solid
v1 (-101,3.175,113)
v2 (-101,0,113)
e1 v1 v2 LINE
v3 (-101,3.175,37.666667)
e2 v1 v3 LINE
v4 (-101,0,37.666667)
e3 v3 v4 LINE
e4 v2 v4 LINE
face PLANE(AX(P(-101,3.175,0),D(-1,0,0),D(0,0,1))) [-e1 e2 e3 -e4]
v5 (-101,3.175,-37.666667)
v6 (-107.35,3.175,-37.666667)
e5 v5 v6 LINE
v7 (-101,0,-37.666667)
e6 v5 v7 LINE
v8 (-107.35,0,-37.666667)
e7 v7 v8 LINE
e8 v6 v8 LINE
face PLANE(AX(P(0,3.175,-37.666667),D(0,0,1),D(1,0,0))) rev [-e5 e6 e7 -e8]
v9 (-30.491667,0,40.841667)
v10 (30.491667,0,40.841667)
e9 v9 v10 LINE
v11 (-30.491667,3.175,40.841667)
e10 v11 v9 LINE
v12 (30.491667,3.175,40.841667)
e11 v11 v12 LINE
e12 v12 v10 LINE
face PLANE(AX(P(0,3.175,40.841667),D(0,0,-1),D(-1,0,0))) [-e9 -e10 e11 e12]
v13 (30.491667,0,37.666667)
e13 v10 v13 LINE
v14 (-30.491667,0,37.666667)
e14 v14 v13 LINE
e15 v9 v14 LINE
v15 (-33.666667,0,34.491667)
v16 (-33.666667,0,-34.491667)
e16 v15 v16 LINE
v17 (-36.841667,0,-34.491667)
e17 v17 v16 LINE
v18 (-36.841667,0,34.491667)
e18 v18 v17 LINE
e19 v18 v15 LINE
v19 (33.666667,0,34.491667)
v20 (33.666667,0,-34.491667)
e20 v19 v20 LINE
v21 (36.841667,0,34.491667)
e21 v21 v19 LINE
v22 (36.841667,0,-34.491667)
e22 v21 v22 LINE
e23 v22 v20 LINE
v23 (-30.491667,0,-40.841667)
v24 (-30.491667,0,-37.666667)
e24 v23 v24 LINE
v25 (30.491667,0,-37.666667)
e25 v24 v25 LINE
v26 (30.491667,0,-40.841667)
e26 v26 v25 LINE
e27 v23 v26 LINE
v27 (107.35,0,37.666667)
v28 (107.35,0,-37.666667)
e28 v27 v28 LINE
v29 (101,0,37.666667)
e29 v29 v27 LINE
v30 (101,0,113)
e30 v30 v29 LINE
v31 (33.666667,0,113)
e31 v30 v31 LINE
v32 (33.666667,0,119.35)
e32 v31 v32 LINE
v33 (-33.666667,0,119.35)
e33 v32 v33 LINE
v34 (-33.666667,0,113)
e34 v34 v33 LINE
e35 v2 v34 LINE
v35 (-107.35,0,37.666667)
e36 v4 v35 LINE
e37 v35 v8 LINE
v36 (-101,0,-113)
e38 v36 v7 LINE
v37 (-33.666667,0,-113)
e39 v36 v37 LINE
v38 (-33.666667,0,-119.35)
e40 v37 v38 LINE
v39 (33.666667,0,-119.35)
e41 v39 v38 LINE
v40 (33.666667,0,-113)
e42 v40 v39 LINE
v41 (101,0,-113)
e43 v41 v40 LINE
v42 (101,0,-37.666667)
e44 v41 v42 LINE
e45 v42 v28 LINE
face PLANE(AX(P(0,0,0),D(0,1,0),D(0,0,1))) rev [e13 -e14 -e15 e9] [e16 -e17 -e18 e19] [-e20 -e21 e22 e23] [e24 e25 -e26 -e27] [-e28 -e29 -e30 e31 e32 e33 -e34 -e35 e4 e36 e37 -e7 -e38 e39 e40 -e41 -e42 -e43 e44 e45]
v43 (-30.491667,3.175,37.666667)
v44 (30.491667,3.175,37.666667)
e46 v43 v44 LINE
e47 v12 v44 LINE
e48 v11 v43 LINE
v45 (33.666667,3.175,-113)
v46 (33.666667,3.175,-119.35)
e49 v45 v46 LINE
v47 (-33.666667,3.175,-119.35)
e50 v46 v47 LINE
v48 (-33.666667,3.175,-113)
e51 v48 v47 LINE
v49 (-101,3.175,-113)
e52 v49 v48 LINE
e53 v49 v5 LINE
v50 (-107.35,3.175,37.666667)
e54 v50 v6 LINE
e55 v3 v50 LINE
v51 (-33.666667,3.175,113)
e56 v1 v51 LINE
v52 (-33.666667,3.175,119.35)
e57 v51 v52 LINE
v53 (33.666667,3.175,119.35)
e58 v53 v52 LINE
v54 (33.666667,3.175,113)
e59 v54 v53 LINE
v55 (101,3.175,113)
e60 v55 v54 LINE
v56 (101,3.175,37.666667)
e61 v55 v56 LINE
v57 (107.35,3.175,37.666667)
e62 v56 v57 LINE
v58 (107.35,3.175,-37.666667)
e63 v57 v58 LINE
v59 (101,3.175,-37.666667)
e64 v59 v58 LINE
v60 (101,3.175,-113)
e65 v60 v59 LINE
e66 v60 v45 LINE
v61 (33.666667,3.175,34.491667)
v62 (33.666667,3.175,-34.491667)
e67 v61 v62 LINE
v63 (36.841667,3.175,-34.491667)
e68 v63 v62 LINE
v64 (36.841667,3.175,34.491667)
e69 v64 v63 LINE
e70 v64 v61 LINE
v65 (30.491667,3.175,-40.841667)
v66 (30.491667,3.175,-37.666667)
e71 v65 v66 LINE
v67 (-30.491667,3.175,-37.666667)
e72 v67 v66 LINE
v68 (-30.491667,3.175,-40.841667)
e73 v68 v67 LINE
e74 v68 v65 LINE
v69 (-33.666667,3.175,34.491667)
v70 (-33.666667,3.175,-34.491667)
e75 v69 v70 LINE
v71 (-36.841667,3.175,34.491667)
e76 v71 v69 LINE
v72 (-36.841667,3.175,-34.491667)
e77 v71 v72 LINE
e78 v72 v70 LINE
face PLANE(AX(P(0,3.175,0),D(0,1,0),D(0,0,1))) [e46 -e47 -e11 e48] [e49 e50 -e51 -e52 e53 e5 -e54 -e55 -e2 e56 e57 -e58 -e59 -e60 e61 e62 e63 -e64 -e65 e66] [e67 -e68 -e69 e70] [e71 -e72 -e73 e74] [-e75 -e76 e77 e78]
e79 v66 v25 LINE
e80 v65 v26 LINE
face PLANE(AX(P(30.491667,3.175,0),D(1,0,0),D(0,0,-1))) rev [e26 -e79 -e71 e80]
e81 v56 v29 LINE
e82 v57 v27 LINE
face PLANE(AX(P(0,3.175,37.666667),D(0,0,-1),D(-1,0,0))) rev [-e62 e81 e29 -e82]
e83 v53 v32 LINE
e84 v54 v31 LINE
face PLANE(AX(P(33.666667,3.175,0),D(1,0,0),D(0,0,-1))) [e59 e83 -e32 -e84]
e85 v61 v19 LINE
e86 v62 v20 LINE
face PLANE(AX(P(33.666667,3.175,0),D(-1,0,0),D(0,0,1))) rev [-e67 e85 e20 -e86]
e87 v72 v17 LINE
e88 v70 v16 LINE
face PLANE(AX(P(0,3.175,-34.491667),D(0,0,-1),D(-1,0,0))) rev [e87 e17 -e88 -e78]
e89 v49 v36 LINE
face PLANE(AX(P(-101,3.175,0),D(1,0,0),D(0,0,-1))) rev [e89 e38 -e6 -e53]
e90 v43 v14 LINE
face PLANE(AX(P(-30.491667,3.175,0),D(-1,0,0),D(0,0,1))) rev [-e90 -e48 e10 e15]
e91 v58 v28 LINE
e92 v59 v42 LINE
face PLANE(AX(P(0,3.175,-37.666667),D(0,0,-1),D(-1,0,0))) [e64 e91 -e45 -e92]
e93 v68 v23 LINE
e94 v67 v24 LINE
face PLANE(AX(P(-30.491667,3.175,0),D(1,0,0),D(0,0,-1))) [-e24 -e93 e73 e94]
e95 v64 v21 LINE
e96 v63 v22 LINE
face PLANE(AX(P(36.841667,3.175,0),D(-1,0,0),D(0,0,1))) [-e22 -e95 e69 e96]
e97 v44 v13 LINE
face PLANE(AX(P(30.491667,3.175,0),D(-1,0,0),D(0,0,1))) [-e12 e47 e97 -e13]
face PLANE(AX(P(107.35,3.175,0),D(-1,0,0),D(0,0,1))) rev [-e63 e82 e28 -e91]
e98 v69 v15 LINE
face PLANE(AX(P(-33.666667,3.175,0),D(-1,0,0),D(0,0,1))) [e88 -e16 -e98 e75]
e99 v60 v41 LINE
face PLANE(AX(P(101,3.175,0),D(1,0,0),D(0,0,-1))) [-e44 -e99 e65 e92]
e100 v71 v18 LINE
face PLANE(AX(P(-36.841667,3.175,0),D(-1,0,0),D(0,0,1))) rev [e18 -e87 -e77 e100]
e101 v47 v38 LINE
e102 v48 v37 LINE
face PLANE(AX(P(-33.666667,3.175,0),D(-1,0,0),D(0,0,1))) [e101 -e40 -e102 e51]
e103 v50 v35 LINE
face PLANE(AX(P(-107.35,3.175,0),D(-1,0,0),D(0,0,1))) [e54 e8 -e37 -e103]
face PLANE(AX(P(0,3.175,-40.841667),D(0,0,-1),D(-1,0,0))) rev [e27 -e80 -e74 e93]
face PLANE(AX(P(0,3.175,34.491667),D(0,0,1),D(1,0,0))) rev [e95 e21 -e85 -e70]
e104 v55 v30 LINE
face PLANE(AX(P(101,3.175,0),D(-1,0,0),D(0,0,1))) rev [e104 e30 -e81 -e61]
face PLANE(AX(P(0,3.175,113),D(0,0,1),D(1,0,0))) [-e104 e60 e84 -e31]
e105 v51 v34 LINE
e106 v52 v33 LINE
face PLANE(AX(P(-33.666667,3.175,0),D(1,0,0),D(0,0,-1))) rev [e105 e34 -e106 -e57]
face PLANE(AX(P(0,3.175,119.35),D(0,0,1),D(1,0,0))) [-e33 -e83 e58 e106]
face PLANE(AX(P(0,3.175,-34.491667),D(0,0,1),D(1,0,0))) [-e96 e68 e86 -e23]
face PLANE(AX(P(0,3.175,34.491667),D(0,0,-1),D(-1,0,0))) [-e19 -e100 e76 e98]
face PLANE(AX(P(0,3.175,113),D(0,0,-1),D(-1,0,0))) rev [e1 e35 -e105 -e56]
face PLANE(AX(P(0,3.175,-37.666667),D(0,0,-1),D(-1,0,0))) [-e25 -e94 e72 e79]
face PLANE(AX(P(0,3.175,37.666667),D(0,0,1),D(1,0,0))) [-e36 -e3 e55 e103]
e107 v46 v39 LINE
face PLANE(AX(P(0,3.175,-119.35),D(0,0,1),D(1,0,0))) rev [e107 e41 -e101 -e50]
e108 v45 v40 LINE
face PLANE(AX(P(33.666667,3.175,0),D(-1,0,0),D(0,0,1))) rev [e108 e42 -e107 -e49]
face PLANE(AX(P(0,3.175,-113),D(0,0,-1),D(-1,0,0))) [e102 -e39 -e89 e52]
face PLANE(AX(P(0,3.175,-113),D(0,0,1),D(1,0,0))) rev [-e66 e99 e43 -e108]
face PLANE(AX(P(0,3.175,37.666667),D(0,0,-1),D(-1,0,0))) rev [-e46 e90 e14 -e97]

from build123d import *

# Parameters (mm, degrees)
SKETCH1_W                 = 6.35
SKETCH1_H                 = 37.666666667
SKETCH1_W_2               = 33.666666667
SKETCH1_H_2               = 6.35
BOSS_EXTRUDE1_DEPTH       = 3.175
MIRROR1_START             = -101
MIRROR1_OUTLINE_W         = 3.175
MIRROR1_OUTLINE_H         = 3.175
MIRROR1_OUTLINE_H_2       = 72.158333333
MIRROR1_DEPTH             = 101
MIRROR1_START_2           = -107.35
MIRROR1_2_OUTLINE_W       = 3.175
MIRROR1_2_OUTLINE_H       = 37.666666667
MIRROR1_2_DEPTH           = 70.508333333
MIRROR1_START_3           = -33.666666667
MIRROR1_3_OUTLINE_W       = 3.175
MIRROR1_3_OUTLINE_H       = 34.491666667
MIRROR1_3_OUTLINE_H_2     = 6.35
MIRROR1_3_DEPTH           = 33.666666667
MIRROR1_4_OUTLINE_W       = 3.175
MIRROR1_4_OUTLINE_H       = 3.175
MIRROR1_4_DEPTH           = 70.508333333
MIRROR4_COPY_1_SKETCH_W   = 6.35
MIRROR4_COPY_1_SKETCH_H   = 37.666666667
MIRROR4_COPY_1_SKETCH_W_2 = 33.666666667
MIRROR4_COPY_1_SKETCH_H_2 = 6.35
MIRROR4_COPY_1_DEPTH      = 3.175
MIRROR4_COPY_2_SKETCH_W   = 6.35
MIRROR4_COPY_2_SKETCH_H   = 37.666666667
MIRROR4_COPY_2_SKETCH_W_2 = 33.666666667
MIRROR4_COPY_2_SKETCH_H_2 = 6.35
MIRROR4_COPY_2_DEPTH      = 3.175


# Read off the part's stored shape, not the designer's step: Mirror1
with BuildPart() as part:
    # Sketch1 → Boss-Extrude1 (new body)
    with BuildSketch(Plane(origin=(0, 0, 0), x_dir=(1, 0, 0), z_dir=(0, 1, 0))):
        Polygon((-33.666666667, 113), (-101, 113), (-101, 37.666666667), (-101, 0), (-36.841666667, 0), (-36.841666667, 34.491666667), (-33.666666667, 34.491666667), (-33.666666667, 0), (0, 0), (0, 37.666666667), (-30.491666667, 37.666666667), (-30.491666667, 40.841666667), (0, 40.841666667), (0, 113), align=None)
        with Locations((-104.175, 18.833333334)):
            Rectangle(SKETCH1_W, SKETCH1_H)
        with Locations((-16.833333334, 116.175)):
            Rectangle(SKETCH1_W_2, SKETCH1_H_2)
    boss_extrude1 = extrude(amount=BOSS_EXTRUDE1_DEPTH)



with BuildPart() as body_2:
    # Mirror1 outline → Mirror1 (new body)
    with BuildSketch(Plane.YZ.offset(MIRROR1_START)):
        with Locations((1.5875, 36.079166667)):
            Rectangle(MIRROR1_OUTLINE_W, MIRROR1_OUTLINE_H)
        with Locations((1.5875, 76.920833333)):
            Rectangle(MIRROR1_OUTLINE_W, MIRROR1_OUTLINE_H_2)
    extrude(amount=MIRROR1_DEPTH)


with BuildPart() as part_1:
    add(part.part)

    add(body_2.part)  # Mirror1 2 merges body 2
    # Mirror1 2 outline → Mirror1 2 (add)
    with BuildSketch(Plane.YZ.offset(MIRROR1_START_2)):
        with Locations((1.5875, 18.833333334)):
            Rectangle(MIRROR1_2_OUTLINE_W, MIRROR1_2_OUTLINE_H)
    extrude(amount=MIRROR1_2_DEPTH)

    # Mirror1 3 outline → Mirror1 3 (add)
    with BuildSketch(Plane.YZ.offset(MIRROR1_START_3)):
        with Locations((1.5875, 17.245833334)):
            Rectangle(MIRROR1_3_OUTLINE_W, MIRROR1_3_OUTLINE_H)
        with Locations((1.5875, 116.175)):
            Rectangle(MIRROR1_3_OUTLINE_W, MIRROR1_3_OUTLINE_H_2)
    extrude(amount=MIRROR1_3_DEPTH)

    # Mirror1 4 outline → Mirror1 4 (add)
    with BuildSketch(Plane.YZ.offset(MIRROR1_START)):
        with Locations((1.5875, 39.254166667)):
            Rectangle(MIRROR1_4_OUTLINE_W, MIRROR1_4_OUTLINE_H)
    extrude(amount=MIRROR1_4_DEPTH)

    # Mirror3: Boss-Extrude1 across plane
    add(boss_extrude1.mirror(Plane(origin=(0, 0, 0), x_dir=(0, 0, 1), z_dir=(1, 0, 0))))

    # Mirror4 copy 1 sketch → Mirror4 copy 1 (add)
    with BuildSketch(Plane(origin=(0, 0, 0), x_dir=(-1, 0, 0), z_dir=(0, 1, 0))):
        Polygon((-33.666666667, 113), (-101, 113), (-101, 37.666666667), (-101, 0), (-36.841666667, 0), (-36.841666667, 34.491666667), (-33.666666667, 34.491666667), (-33.666666667, 0), (0, 0), (0, 37.666666667), (-30.491666667, 37.666666667), (-30.491666667, 40.841666667), (0, 40.841666667), (0, 113), align=None)
        with Locations((-104.175, 18.833333334)):
            Rectangle(MIRROR4_COPY_1_SKETCH_W, MIRROR4_COPY_1_SKETCH_H)
        with Locations((-16.833333334, 116.175)):
            Rectangle(MIRROR4_COPY_1_SKETCH_W_2, MIRROR4_COPY_1_SKETCH_H_2)
    extrude(amount=MIRROR4_COPY_1_DEPTH)

    # Mirror4 copy 2 sketch → Mirror4 copy 2 (add)
    with BuildSketch(Plane(origin=(0, 0, 0), x_dir=(1, 0, 0), z_dir=(0, 1, 0))):
        Polygon((-33.666666667, -113), (-101, -113), (-101, -37.666666667), (-101, 0), (-36.841666667, 0), (-36.841666667, -34.491666667), (-33.666666667, -34.491666667), (-33.666666667, 0), (0, 0), (0, -37.666666667), (-30.491666667, -37.666666667), (-30.491666667, -40.841666667), (0, -40.841666667), (0, -113), align=None)
        with Locations((-104.175, -18.833333334)):
            Rectangle(MIRROR4_COPY_2_SKETCH_W, MIRROR4_COPY_2_SKETCH_H)
        with Locations((-16.833333334, -116.175)):
            Rectangle(MIRROR4_COPY_2_SKETCH_W_2, MIRROR4_COPY_2_SKETCH_H_2)
    extrude(amount=MIRROR4_COPY_2_DEPTH)


solid = part_1.part
